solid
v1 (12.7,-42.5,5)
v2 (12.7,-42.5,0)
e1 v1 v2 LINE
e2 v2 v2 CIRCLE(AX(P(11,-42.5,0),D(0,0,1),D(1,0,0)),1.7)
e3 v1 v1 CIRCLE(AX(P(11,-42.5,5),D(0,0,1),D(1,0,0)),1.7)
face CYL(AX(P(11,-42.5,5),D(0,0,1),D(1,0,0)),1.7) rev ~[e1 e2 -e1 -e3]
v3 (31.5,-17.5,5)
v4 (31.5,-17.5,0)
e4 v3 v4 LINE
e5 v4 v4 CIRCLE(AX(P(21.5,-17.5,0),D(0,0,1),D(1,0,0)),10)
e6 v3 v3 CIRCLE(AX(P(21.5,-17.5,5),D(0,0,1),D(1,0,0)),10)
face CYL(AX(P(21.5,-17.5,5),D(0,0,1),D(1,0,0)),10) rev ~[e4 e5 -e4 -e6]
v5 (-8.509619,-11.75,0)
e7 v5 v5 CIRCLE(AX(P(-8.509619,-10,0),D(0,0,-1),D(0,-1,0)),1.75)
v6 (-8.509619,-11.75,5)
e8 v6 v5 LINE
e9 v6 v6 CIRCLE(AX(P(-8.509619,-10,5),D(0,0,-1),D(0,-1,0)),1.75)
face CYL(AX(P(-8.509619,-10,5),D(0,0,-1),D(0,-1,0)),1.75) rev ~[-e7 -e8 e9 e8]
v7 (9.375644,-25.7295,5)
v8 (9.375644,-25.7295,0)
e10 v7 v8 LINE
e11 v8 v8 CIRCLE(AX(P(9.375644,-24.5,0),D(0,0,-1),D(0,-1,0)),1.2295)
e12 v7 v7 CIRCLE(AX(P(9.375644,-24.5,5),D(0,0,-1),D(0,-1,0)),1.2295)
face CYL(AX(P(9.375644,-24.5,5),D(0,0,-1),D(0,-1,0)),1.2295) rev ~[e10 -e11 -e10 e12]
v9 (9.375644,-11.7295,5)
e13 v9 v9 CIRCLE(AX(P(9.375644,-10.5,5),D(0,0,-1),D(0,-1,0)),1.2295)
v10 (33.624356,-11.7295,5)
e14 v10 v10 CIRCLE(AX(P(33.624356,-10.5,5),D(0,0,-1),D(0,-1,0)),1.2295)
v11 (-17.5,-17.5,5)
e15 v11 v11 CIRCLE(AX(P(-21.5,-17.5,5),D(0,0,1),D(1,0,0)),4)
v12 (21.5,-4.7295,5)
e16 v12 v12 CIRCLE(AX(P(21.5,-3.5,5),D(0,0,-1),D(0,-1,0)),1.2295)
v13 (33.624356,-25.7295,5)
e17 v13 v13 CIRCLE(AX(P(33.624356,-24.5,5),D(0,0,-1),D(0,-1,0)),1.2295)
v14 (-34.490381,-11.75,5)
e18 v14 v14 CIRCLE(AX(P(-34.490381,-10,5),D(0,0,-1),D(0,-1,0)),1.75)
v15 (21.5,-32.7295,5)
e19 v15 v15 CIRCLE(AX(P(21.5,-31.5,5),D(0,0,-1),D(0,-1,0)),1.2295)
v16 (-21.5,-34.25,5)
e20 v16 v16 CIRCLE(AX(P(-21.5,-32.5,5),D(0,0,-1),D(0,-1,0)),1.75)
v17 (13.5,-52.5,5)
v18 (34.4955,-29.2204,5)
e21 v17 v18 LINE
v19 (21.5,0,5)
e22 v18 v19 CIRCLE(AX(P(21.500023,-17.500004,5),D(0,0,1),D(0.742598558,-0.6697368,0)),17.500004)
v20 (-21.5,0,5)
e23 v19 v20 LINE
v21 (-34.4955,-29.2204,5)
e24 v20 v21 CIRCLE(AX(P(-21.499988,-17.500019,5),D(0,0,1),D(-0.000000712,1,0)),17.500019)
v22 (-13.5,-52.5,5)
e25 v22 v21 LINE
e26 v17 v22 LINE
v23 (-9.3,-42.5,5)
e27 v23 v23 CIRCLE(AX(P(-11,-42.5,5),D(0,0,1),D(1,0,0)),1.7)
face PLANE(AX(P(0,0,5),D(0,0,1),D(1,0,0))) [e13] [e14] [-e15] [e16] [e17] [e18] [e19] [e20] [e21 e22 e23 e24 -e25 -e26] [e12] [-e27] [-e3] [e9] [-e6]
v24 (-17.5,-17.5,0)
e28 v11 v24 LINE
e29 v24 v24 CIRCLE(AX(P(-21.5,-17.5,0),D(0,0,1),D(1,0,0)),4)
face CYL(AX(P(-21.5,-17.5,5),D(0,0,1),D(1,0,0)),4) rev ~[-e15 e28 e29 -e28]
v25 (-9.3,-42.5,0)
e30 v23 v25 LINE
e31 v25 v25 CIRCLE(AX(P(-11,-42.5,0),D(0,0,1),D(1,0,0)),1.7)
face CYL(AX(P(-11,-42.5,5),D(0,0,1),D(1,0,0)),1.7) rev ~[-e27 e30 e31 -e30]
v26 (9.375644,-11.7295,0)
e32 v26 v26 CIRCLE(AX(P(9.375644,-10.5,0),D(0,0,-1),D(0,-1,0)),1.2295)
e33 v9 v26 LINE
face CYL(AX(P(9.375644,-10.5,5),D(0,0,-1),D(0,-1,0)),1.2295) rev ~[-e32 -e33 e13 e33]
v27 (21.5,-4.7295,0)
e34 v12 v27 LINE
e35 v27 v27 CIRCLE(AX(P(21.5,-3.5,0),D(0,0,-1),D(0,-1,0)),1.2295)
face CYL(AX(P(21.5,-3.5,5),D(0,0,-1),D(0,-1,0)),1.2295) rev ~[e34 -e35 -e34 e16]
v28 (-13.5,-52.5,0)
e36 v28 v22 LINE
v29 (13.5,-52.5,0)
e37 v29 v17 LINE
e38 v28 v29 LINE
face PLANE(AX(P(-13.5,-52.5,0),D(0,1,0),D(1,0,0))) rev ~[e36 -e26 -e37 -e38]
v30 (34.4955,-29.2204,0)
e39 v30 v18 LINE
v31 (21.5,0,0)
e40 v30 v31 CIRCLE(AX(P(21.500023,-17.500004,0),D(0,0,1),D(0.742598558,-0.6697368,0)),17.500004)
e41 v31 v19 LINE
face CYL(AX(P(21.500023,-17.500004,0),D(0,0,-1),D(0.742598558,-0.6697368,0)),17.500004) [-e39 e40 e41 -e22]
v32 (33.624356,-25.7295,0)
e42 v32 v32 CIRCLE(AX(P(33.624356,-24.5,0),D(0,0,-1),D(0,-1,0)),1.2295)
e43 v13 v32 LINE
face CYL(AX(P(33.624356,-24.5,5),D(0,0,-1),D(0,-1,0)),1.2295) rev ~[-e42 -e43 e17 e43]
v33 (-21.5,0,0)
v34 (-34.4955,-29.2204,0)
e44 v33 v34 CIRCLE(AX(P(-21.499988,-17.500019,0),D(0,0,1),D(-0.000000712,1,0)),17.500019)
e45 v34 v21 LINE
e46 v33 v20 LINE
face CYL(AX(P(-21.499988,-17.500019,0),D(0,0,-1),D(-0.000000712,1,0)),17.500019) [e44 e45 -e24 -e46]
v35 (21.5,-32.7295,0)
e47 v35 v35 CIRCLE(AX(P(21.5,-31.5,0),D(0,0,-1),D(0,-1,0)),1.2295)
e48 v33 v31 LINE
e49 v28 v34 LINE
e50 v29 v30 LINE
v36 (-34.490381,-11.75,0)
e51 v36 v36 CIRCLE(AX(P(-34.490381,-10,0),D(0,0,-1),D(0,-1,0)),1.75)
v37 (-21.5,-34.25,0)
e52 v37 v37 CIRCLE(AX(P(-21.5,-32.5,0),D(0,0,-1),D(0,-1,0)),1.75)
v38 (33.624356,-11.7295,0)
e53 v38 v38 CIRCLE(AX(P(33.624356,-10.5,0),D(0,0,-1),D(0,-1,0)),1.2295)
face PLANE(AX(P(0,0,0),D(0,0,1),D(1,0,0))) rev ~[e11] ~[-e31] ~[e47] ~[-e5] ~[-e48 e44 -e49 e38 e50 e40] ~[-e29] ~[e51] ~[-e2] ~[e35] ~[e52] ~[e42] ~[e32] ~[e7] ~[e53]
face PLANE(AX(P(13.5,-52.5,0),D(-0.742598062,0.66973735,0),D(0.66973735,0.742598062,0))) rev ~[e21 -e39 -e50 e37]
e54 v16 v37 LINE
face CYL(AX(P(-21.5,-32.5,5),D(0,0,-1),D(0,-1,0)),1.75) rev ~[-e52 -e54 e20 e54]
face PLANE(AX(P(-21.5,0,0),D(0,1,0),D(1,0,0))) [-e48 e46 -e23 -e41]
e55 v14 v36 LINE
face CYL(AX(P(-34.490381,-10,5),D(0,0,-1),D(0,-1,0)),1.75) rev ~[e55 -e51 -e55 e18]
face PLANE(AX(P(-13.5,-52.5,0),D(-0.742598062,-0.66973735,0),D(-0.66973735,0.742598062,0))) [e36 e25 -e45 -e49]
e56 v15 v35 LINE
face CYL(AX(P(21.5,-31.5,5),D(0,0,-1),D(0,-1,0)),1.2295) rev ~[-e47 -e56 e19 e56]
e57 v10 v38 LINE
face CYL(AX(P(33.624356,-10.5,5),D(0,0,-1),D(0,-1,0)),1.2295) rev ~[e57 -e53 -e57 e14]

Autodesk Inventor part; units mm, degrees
ref_plane "YZ Plane" through (0, 0, 0) normal (1, 0, 0) x (0, 1, 0)
ref_plane "XZ Plane" through (0, 0, 0) normal (0, 1, 0) x (-1, 0, 0)
ref_plane "XY Plane" through (0, 0, 0) normal (0, 0, 1) x (1, 0, 0)
sketch "Skizze1" plane through (0, 0, 0) normal (0, 0, 1) x (1, 0, 0)
  line L0 (0, -63.8443) -> (0, 15.5659) projected
  line L1 (-61.5828, 0) -> (61.5828, 0) projected
  line L2 (-13.5, -52.5) -> (13.5, -52.5)
  line L3 (13.5, -52.5) -> (34.4955, -29.2204)
  line L4 (-13.5, -52.5) -> (-34.4955, -29.2204)
  arc A0 (-21.5, 0) -> (-34.4955, -29.2204) centre (-21.5, -17.5) ccw
  arc A1 (34.4955, -29.2204) -> (21.5, 0) centre (21.5, -17.5) ccw
  line L5 (-21.5, 0) -> (21.5, 0)
  point P0 (0, 0)
  dimension "d0" = 43
  dimension "d1" = 27
  dimension "d2" = 35
  dimension "d3" = 17.5
extrude "Extrusion1" add sketch "Skizze1" along normal blind 5
sketch "Skizze2" plane through (0, 0, 5) normal (0, 0, 1) x (1, 0, 0)
  line L0 (-61.5828, 0) -> (61.5828, 0) projected
  line L1 (0, -63.8443) -> (0, 15.5659) projected
  arc A0 (-21.5, 0) -> (-34.4955, -29.2204) centre (-21.5, -17.5) ccw projected
  circle A1 centre (-21.5, -17.5) radius 4
  arc A2 (34.4955, -29.2204) -> (21.5, 0) centre (21.5, -17.5) ccw projected
  circle A3 centre (21.5, -17.5) radius 10
  circle A4 centre (-11, -42.5) radius 1.7
  circle A5 centre (11, -42.5) radius 1.7
  line L2 (-13.5, -52.5) -> (13.5, -52.5) projected
  point P0 (0, 0)
  dimension "d7" = 8
  dimension "d8" = 20
  dimension "d9" = 3.4
  dimension "d10" = 3.4
  dimension "d11" = 10
  dimension "d12" = 22
extrude "Extrusion2" cut sketch "Skizze2" against normal up to next
sketch "Skizze3" plane through (0, 0, 5) normal (0, 0, 1) x (1, 0, 0)
  arc A0 (-21.5, 0) -> (-34.4955, -29.2204) centre (-21.5, -17.5) ccw construction
  circle A1 centre (-21.5, -17.5) radius 15 construction
  line L0 (-21.5, -2.5) -> (-21.5, -32.5) construction
  point P0 (0, 0)
  dimension "d15" = 30
hole "Bohrung1" at (-21.5, -32.5, 5) direction (0, 0, -1) diameter 3.5 end up to surface
pattern_circular "Runde Anordnung1" count 3 over 360 about axis through (-21.5, -17.5, 5) along (0, 0, -1) of "Bohrung1"
sketch "Skizze4" plane through (0, 0, 5) normal (0, 0, 1) x (1, 0, 0)
  arc A0 (34.4955, -29.2204) -> (21.5, 0) centre (21.5, -17.5) ccw construction
  circle A1 centre (21.5, -17.5) radius 14 construction
  line L0 (21.5, -3.5) -> (21.5, -31.5) construction
  point P0 (0, 0)
  dimension "d26" = 28
hole "Bohrung2" at (21.5, -31.5, 5) direction (0, 0, -1) diameter 2.459 end up to surface thread size "M3x0.5" class "6H" standard "ISO Metric profile"
pattern_circular "Runde Anordnung2" count 6 over 360 about axis through (21.5, -17.5, 5) along (0, 0, -1) of "Bohrung2"
properties part number "Zylinderplatte"
